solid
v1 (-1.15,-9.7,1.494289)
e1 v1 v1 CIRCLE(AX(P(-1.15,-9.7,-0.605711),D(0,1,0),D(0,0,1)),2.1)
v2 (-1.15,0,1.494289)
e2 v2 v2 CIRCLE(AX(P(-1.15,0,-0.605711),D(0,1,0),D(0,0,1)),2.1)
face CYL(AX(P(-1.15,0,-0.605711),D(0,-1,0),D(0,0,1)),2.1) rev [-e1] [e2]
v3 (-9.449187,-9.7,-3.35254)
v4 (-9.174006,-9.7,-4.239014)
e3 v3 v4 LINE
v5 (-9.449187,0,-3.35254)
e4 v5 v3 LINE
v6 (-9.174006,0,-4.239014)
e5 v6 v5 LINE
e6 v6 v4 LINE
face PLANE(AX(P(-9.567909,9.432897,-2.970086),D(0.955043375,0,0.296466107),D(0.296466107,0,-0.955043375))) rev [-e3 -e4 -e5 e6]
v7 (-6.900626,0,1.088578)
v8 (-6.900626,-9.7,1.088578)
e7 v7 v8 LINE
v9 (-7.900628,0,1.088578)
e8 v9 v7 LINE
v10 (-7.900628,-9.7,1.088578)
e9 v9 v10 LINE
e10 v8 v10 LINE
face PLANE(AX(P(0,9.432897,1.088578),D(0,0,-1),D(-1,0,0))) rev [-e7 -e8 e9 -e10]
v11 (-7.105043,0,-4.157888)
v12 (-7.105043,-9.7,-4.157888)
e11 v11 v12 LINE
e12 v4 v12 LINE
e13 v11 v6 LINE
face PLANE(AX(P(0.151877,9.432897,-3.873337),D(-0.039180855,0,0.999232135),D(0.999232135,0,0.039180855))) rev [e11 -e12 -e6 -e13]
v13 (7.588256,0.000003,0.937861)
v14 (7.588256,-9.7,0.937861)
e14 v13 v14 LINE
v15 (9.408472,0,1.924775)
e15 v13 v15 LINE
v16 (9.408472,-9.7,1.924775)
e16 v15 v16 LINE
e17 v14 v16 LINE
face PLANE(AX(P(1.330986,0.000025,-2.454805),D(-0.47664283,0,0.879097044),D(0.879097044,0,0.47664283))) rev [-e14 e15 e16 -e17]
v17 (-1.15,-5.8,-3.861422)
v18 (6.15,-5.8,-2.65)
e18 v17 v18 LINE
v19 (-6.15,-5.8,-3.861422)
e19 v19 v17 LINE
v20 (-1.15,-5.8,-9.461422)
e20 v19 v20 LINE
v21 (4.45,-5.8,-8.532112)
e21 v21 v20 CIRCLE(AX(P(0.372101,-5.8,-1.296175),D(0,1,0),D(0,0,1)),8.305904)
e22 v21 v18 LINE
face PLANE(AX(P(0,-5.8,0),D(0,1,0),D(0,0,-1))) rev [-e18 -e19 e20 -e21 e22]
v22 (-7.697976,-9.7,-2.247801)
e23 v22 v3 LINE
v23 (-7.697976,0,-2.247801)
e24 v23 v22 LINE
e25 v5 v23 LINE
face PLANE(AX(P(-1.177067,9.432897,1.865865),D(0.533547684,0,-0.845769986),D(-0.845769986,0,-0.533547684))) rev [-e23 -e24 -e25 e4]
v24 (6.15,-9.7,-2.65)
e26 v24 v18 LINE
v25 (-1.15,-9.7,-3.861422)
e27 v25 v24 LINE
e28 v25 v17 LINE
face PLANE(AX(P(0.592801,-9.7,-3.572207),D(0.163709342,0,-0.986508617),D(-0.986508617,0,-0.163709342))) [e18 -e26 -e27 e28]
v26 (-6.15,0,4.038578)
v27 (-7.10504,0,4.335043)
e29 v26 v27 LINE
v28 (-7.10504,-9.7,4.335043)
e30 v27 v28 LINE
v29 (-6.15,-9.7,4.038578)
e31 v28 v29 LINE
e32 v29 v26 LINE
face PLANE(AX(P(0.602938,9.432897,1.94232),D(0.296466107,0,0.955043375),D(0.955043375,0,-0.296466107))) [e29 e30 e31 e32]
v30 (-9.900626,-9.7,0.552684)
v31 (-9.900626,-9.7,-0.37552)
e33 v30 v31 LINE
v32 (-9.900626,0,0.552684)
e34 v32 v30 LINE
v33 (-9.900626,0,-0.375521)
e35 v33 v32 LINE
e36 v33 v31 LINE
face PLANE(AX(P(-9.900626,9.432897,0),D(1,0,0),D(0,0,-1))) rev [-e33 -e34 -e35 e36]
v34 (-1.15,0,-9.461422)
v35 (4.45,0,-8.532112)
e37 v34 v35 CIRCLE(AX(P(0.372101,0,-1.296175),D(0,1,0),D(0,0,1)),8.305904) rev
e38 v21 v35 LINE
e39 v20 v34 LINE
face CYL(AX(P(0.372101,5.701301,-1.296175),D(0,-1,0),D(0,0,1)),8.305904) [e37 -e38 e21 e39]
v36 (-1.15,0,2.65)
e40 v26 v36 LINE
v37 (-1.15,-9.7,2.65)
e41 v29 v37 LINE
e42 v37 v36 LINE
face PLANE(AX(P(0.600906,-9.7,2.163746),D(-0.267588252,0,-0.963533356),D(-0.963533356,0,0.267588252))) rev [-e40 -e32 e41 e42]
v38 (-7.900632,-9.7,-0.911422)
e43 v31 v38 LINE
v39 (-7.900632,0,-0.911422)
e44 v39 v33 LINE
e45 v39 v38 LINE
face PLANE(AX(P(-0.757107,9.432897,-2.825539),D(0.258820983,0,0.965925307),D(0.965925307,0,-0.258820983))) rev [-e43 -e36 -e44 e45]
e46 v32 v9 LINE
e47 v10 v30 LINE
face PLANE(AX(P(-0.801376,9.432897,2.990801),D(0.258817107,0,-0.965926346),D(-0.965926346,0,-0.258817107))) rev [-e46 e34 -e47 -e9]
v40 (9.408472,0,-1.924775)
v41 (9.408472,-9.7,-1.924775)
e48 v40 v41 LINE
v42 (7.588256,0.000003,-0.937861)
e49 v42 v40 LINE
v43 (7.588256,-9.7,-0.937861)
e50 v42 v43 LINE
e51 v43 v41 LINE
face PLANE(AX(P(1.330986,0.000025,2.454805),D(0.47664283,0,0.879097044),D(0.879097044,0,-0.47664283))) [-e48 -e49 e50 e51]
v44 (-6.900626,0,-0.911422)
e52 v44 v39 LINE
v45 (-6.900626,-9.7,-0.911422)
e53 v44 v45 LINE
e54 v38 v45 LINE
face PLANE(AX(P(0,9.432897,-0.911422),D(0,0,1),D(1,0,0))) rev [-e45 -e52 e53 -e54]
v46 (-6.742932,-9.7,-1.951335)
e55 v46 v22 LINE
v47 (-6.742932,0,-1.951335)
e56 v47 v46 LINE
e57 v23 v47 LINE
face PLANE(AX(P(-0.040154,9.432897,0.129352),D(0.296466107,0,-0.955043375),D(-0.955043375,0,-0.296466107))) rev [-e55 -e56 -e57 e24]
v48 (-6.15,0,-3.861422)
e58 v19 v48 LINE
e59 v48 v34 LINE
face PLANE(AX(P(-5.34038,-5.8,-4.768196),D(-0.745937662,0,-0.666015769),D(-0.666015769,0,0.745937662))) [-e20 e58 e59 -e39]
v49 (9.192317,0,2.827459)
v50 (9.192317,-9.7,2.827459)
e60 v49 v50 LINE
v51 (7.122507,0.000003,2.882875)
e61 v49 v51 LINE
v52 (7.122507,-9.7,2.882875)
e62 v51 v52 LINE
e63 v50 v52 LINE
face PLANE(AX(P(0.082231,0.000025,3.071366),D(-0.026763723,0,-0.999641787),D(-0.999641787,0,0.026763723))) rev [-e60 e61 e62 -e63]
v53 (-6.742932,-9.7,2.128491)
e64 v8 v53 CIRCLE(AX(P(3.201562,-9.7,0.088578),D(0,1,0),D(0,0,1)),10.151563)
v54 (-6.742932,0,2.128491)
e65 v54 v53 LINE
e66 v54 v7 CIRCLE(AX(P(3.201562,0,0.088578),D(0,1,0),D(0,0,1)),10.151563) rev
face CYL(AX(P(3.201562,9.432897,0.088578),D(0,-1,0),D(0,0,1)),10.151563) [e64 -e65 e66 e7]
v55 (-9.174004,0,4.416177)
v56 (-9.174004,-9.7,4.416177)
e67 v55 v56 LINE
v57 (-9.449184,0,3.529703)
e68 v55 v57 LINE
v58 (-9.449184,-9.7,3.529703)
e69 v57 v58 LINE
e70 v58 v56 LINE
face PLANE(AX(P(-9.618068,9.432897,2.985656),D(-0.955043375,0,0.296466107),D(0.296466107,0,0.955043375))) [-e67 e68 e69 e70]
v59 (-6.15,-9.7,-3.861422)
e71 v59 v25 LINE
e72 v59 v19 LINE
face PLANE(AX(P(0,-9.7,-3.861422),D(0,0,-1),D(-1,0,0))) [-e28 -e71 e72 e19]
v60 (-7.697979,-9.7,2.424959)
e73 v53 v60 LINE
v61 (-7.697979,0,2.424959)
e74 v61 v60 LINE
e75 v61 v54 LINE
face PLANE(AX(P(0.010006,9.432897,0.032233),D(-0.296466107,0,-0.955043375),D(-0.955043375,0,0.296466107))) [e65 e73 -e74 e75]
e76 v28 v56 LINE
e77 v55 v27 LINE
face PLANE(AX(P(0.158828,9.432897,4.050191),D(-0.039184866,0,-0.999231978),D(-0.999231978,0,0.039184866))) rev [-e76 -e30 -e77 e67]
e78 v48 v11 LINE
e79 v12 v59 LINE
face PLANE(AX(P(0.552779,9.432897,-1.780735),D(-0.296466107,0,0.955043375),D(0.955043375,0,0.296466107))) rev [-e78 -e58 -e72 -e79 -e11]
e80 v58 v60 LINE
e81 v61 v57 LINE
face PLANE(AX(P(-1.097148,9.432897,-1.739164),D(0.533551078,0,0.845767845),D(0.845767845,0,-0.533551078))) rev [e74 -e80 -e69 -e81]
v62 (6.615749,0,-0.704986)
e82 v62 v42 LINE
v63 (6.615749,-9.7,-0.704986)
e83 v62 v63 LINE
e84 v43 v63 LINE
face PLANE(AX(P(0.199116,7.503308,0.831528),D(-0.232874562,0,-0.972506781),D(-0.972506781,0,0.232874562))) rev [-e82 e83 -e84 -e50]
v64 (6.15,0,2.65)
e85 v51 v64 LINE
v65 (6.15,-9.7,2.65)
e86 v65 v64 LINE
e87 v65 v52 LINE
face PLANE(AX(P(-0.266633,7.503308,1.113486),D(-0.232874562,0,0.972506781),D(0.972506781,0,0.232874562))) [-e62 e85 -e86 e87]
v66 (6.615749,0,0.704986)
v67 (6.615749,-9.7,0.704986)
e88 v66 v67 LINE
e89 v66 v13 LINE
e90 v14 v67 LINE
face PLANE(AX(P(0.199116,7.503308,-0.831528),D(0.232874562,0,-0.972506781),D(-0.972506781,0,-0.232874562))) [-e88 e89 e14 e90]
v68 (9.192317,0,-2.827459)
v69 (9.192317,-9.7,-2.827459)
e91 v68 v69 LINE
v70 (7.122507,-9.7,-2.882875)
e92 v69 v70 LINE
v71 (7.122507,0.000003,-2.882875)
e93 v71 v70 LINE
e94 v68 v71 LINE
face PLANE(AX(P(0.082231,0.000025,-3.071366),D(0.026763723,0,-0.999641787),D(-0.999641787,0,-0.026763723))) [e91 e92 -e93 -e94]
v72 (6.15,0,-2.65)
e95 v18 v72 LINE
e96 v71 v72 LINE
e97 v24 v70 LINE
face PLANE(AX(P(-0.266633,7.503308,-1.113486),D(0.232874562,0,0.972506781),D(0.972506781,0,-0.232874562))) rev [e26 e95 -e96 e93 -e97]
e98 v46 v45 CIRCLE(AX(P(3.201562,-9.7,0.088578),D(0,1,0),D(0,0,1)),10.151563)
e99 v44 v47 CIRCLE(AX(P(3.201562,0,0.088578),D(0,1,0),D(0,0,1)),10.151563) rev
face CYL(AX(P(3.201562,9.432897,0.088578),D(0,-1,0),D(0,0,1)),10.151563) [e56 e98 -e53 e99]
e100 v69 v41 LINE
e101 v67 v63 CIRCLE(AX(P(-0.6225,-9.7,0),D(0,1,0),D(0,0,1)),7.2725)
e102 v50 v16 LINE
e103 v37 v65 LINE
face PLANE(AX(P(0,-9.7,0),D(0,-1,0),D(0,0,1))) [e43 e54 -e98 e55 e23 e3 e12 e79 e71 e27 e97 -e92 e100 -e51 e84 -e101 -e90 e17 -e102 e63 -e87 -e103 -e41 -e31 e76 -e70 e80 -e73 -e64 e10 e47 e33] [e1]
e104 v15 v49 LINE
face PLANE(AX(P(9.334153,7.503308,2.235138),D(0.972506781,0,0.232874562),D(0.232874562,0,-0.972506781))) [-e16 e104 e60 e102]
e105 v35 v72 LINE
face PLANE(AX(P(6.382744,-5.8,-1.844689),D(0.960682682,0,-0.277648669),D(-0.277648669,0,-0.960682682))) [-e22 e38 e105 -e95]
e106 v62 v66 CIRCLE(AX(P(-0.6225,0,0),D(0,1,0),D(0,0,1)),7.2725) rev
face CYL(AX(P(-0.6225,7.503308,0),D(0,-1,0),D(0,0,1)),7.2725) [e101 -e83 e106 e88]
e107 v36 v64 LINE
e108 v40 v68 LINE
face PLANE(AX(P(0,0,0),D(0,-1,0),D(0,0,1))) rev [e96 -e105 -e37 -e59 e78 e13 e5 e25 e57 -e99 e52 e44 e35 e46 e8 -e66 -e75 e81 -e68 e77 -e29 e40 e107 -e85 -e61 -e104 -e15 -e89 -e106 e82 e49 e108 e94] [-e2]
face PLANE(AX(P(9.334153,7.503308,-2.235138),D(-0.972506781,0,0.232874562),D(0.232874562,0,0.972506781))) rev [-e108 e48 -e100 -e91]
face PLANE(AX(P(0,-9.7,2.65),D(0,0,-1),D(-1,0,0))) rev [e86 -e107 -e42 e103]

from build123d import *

# Parameters (mm, degrees)
BOSS_EXTRUDE1_DEPTH = 9.7
BOSS_EXTRUDE2_DEPTH = 5.8
CUT_EXTRUDE1_DEPTH  = 15.880557968
BOSS_EXTRUDE3_REACH = 16.881
CUT_EXTRUDE2_DEPTH  = 17.567792011
BOSS_EXTRUDE4_START = -9.7
BOSS_EXTRUDE4_DEPTH = 9.7
BOSS_EXTRUDE5_DEPTH = 5.8


# Read off the part's stored shape, not the designer's step: Boss-Extrude4
with BuildPart() as part:
    # Sketch1 → Boss-Extrude1 (new body)
    with BuildSketch(Plane(origin=(0, 0, 0), x_dir=(1, 0, 0), z_dir=(0, 1, 0))):
        Polygon((6.15, 2.65), (6.15, -2.65), (-1.15, -2.65), (-6.15, -4.038578044), (-6.15, 3.861421956), (-1.15, 3.861421956), align=None)
    extrude(amount=BOSS_EXTRUDE1_DEPTH)

    # Sketch2 → Boss-Extrude2 (add)
    with BuildSketch(Plane.XZ):
        Polygon((-6.15, -3.861421956), (-1.15, -9.461421956), (-1.15, -3.861421956), align=None)
        Polygon((-1.15, -3.861421956), (-1.15, -9.461421956), (4.45, -8.532111962), (4.45, -2.932111962), align=None)
        Polygon((4.45, -2.932111962), (4.45, -8.532111962), (6.15, -2.65), align=None)
    extrude(amount=-BOSS_EXTRUDE2_DEPTH)

    # Sketch3 → Cut-Extrude1 (cut, through all)
    with BuildSketch(Plane(origin=(0, 9.7, 0), x_dir=(1, 0, 0), z_dir=(0, 1, 0))):
        with BuildLine():
            ThreePointArc((0.95, 0.605710978), (0.33492424, 2.090635219), (-1.15, 2.705710978))
            Line((-1.15, 2.705710978), (-1.15, -1.494289022))
            ThreePointArc((-1.15, -1.494289022), (0.33492424, -0.879213262), (0.95, 0.605710978))
        make_face()
        with BuildLine():
            Line((-1.15, -1.494289022), (-1.15, 2.705710978))
            ThreePointArc((-1.15, 2.705710978), (-3.25, 0.605710978), (-1.15, -1.494289022))
        make_face()
    extrude(amount=-CUT_EXTRUDE1_DEPTH, mode=Mode.SUBTRACT)

    # Boss-Extrude3: up to this face of the body (flat: up to its plane)
    boss_extrude3_end = Plane(part.part.faces().sort_by_distance((0.174384558, 0, -2.694350329))[0])
    # Sketch4 → Boss-Extrude3 (add, up to the picked face)
    with BuildSketch(Plane(origin=(0, 9.7, 0), x_dir=(1, 0, 0), z_dir=(0, 1, 0)), mode=Mode.PRIVATE) as boss_extrude3_sk1:
        with BuildLine():
            Line((6.615749123, 0.704986439), (9.533269465, 1.403610124))
            Line((9.533269465, 1.403610124), (9.067520342, 3.348623685))
            Line((9.067520342, 3.348623685), (6.15, 2.65))
            Line((6.15, 2.65), (6.15, -2.65))
            Line((6.15, -2.65), (9.067520342, -3.348623685))
            Line((9.067520342, -3.348623685), (9.533269465, -1.403610124))
            Line((9.533269465, -1.403610124), (6.615749123, -0.704986439))
            ThreePointArc((6.615749123, -0.704986439), (6.65, 0), (6.615749123, 0.704986439))
        make_face()
    boss_extrude3_tool1 = split(extrude(boss_extrude3_sk1.sketch, amount=-BOSS_EXTRUDE3_REACH, mode=Mode.PRIVATE), bisect_by=boss_extrude3_end, keep=Keep.BOTH, mode=Mode.PRIVATE)
    add(boss_extrude3_tool1.solids().sort_by(Axis((6.574967, 9.7, 0), (0, -1, 0)))[0])

    # Sketch5 → Cut-Extrude2 (cut, through all)
    with BuildSketch(Plane(origin=(0, 9.7, 0), x_dir=(1, 0, 0), z_dir=(0, 1, 0))):
        Polygon((9.067520342, 3.348623685), (7.122506781, 2.882874562), (9.192317444, 2.827458872), align=None)
        Polygon((9.408472364, 1.924774937), (7.588255904, 0.937861), (9.533269465, 1.403610124), align=None)
        Polygon((9.408472364, -1.924774937), (9.533269465, -1.403610124), (7.588255904, -0.937861), align=None)
        Polygon((9.192317444, -2.827458872), (7.122506781, -2.882874562), (9.067520342, -3.348623685), align=None)
    extrude(amount=-CUT_EXTRUDE2_DEPTH, mode=Mode.SUBTRACT)

    # Boss-Extrude4 outline → Boss-Extrude4 (add)
    with BuildSketch(Plane(origin=(0, 9.7, 0), x_dir=(1, 0, 0), z_dir=(0, 1, 0)).offset(BOSS_EXTRUDE4_START)):
        with BuildLine():
            Line((-6.900626431, 0.911421956), (-7.900631816, 0.911421956))
            Line((-7.900631816, 0.911421956), (-9.900626719, 0.375520635))
            Line((-9.900626719, 0.375520635), (-9.900626431, -0.552684328))
            Line((-9.900626431, -0.552684328), (-7.900627802, -1.088578044))
            Line((-7.900627802, -1.088578044), (-6.900626431, -1.088578044))
            ThreePointArc((-6.900626431, -1.088578044), (-6.835256527, -1.610578376), (-6.742932214, -2.128491295))
            Line((-6.742932214, -2.128491295), (-7.697979422, -2.424958592))
            Line((-7.697979422, -2.424958592), (-9.449184507, -3.529703076))
            Line((-9.449184507, -3.529703076), (-9.1740036, -4.416177353))
            Line((-9.1740036, -4.416177353), (-7.105039542, -4.335042961))
            Line((-7.105039542, -4.335042961), (-6.15, -4.038578044))
            Line((-6.15, -4.038578044), (-6.15, 3.861421956))
            Line((-6.15, 3.861421956), (-7.105043375, 4.157888063))
            Line((-7.105043375, 4.157888063), (-9.174005832, 4.239014076))
            Line((-9.174005832, 4.239014076), (-9.44918663, 3.35253973))
            Line((-9.44918663, 3.35253973), (-7.697975589, 2.247801314))
            Line((-7.697975589, 2.247801314), (-6.742932214, 1.951335207))
            ThreePointArc((-6.742932214, 1.951335207), (-6.835256527, 1.433422288), (-6.900626431, 0.911421956))
        make_face()
    extrude(amount=BOSS_EXTRUDE4_DEPTH)

    # Sketch8 → Boss-Extrude5 (add)
    with BuildSketch(Plane(origin=(0, 5.8, 0), x_dir=(1, 0, 0), z_dir=(0, 1, 0))):
        with BuildLine():
            ThreePointArc((1.731854671, 9.490021268), (0.289677429, 9.601670434), (-1.15, 9.461421956))
            Line((-1.15, 9.461421956), (1.65, 8.996766959))
            Line((1.65, 8.996766959), (1.731854671, 9.490021268))
        make_face()
        with BuildLine():
            Line((1.731854671, 9.490021268), (1.65, 8.996766959))
            Line((1.65, 8.996766959), (4.45, 8.532111962))
            ThreePointArc((4.45, 8.532111962), (3.132791885, 9.12986067), (1.731854671, 9.490021268))
        make_face()
    extrude(amount=-BOSS_EXTRUDE5_DEPTH)


with BuildPart() as body_2:
    # Mirror1: mirrored copy
    add(part.part.mirror(Plane.ZX))


solid = body_2.part
